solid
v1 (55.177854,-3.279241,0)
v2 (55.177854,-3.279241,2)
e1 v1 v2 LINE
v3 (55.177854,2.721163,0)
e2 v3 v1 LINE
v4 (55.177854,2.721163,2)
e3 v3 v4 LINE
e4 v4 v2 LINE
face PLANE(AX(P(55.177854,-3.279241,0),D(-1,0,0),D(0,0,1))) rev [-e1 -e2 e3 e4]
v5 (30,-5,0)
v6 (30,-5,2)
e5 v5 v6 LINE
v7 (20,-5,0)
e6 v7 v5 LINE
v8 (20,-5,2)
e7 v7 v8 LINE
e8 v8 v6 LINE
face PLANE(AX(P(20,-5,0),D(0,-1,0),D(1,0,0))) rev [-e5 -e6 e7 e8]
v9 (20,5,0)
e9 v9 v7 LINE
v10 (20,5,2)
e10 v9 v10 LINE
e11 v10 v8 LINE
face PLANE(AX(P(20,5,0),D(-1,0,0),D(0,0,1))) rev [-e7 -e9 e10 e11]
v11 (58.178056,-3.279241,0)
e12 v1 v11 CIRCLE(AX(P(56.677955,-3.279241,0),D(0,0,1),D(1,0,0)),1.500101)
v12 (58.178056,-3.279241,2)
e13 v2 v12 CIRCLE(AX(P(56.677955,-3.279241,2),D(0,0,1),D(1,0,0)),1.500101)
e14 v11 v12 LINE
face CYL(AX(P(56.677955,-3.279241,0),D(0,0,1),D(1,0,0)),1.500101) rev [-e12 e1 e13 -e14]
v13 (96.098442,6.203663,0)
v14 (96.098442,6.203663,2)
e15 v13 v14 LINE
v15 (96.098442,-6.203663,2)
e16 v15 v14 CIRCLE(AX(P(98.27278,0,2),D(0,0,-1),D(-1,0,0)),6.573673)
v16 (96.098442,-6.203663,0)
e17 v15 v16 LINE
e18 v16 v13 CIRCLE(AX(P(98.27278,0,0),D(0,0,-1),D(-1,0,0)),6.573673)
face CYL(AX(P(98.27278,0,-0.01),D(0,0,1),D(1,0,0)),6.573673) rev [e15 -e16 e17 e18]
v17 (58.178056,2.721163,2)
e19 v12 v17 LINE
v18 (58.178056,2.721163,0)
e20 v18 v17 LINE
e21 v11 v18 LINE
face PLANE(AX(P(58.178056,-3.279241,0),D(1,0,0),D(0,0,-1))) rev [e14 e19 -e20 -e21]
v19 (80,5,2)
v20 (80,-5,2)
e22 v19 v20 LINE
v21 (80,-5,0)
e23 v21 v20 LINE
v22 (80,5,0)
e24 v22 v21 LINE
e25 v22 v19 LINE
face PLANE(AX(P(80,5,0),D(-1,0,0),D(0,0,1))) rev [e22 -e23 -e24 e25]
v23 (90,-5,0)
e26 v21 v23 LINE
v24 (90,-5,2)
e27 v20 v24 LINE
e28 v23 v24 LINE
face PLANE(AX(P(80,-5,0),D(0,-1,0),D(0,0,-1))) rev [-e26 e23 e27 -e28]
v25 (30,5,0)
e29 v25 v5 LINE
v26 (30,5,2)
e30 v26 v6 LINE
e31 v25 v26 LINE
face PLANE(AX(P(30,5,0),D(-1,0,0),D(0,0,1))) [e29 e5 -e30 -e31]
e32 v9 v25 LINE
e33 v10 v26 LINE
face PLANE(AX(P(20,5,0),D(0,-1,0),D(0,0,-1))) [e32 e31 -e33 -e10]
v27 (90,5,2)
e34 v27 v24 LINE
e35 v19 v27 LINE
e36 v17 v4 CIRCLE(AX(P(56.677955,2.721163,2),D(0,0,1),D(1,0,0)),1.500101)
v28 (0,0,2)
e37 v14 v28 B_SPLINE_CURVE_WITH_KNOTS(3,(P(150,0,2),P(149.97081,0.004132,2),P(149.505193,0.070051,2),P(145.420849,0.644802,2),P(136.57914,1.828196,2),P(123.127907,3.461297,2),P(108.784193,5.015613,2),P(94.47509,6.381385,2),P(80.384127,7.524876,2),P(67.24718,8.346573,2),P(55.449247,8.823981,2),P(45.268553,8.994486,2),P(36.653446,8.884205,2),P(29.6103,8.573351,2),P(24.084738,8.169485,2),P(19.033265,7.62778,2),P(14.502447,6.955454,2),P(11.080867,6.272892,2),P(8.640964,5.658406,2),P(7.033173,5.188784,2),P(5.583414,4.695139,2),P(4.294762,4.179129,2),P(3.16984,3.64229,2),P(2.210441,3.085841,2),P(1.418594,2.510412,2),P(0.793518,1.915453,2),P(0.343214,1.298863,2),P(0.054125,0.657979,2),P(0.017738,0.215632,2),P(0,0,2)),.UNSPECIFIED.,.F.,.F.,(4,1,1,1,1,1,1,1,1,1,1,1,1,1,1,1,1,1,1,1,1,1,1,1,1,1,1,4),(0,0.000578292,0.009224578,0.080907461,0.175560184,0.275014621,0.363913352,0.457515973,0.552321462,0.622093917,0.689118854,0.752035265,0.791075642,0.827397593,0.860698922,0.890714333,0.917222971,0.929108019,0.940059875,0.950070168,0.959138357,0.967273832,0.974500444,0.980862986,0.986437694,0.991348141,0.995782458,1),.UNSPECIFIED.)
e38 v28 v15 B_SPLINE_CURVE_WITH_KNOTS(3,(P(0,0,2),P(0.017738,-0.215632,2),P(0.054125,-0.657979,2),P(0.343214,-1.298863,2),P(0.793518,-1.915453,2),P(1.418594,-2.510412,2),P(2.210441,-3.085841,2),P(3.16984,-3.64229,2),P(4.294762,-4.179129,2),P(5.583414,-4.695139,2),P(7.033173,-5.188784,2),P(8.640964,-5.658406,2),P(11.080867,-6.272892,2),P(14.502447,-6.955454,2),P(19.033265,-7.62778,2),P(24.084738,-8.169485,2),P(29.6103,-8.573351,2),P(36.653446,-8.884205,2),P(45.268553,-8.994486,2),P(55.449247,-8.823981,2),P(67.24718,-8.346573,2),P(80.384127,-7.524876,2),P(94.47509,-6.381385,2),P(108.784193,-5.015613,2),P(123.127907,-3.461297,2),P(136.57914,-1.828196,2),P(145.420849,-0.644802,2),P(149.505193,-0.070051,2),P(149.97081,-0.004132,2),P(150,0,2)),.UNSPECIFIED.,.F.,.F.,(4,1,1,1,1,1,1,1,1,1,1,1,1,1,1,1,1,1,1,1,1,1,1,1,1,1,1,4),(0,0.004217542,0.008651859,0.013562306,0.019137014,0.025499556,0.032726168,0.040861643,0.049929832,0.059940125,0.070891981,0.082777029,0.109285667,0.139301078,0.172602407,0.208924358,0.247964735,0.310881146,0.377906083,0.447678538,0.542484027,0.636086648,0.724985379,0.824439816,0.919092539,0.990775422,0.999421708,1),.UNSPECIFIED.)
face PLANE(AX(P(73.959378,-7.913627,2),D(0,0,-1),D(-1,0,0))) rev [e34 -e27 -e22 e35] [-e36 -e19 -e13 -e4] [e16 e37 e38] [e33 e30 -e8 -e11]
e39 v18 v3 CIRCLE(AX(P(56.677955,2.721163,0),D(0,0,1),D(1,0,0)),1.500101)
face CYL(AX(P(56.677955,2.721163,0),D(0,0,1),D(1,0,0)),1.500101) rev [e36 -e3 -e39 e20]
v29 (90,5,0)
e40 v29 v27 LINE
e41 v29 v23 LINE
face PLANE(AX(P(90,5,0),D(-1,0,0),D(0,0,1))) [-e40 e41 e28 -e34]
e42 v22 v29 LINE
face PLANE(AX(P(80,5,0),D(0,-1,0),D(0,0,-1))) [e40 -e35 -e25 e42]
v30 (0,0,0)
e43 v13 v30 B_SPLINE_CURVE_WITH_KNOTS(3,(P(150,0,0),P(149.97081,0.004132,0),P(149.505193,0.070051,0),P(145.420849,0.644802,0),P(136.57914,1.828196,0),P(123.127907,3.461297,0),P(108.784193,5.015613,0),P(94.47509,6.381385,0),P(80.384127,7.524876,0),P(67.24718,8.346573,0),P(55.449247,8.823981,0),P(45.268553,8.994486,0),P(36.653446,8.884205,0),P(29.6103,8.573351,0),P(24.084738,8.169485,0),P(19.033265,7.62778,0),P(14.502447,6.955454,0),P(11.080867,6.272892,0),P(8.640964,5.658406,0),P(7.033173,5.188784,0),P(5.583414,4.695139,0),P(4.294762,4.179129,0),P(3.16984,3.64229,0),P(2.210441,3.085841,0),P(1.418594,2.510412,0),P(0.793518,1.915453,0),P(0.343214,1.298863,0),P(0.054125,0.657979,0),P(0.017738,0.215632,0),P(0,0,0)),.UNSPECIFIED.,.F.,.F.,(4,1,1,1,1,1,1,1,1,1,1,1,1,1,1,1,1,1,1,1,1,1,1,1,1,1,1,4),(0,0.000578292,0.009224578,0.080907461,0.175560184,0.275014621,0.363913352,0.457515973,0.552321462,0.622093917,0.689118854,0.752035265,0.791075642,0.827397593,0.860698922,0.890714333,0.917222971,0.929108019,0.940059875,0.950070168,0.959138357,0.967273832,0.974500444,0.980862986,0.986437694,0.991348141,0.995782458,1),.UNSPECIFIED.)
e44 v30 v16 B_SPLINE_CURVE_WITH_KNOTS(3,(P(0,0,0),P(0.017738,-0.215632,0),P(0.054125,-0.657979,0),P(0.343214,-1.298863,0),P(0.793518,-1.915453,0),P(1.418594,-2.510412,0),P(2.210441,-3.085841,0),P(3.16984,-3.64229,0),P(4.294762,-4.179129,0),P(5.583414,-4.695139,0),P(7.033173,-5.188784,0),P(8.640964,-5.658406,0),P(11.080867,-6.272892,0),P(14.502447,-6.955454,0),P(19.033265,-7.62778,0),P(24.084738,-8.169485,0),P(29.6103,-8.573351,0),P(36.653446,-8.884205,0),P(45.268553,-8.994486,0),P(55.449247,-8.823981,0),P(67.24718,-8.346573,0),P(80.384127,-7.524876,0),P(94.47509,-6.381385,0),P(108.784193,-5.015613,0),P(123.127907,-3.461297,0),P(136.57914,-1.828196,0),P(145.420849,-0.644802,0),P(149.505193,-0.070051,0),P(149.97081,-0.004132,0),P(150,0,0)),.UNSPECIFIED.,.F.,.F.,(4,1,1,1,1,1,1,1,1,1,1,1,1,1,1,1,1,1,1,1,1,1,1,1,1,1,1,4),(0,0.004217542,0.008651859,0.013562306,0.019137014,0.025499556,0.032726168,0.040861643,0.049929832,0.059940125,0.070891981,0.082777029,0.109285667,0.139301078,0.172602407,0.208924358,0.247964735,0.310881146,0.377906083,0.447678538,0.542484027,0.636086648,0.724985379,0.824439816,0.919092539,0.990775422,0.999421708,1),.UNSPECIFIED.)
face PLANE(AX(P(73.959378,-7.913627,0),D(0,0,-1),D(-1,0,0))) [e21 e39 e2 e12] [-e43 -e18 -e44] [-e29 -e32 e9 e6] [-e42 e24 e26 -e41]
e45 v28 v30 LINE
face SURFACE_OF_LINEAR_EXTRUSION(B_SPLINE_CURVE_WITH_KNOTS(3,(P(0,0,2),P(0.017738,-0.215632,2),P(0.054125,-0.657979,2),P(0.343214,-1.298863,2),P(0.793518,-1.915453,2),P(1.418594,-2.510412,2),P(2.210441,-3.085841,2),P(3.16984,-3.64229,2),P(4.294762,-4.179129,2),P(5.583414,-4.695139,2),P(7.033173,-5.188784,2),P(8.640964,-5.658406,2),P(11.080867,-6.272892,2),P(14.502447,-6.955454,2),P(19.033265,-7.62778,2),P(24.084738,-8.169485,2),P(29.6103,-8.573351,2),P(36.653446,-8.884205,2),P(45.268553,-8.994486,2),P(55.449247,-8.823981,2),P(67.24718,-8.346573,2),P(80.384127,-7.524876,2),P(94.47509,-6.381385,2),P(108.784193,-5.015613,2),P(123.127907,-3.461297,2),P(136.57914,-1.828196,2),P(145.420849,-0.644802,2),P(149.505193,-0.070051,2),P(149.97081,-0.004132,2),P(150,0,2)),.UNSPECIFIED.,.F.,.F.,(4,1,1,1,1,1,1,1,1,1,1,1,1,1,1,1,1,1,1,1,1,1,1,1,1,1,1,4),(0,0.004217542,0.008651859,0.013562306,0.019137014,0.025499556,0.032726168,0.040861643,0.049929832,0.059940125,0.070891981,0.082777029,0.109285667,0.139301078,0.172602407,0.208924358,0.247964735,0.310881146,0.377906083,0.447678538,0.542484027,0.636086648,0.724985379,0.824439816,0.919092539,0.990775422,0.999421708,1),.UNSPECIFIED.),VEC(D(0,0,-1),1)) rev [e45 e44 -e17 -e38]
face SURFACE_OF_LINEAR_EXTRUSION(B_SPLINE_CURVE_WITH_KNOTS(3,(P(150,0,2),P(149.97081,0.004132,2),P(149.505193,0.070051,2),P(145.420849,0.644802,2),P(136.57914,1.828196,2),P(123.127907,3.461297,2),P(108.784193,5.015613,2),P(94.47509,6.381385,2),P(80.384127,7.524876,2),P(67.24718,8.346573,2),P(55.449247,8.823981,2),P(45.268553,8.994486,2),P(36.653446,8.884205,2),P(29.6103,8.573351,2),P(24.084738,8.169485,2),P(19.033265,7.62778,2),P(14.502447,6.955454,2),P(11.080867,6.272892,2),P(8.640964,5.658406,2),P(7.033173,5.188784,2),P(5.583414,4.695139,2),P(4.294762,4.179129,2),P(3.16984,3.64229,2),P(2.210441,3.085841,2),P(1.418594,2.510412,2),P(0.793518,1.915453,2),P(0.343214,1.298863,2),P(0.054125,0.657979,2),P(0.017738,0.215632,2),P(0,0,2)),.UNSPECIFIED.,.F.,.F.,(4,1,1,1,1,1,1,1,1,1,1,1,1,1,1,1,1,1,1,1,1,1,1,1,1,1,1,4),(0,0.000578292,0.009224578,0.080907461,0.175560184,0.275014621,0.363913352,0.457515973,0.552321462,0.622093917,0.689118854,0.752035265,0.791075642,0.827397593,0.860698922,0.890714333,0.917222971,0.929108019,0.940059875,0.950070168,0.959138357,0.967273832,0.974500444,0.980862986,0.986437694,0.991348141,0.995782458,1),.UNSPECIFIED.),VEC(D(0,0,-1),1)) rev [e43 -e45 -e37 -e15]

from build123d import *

# Parameters (mm, degrees)
BOSS_EXTRUDE1_DEPTH = 2
SKETCH2_W           = 10
SKETCH2_H           = 10
CUT_EXTRUDE1_DEPTH  = 2
CUT_EXTRUDE2_DEPTH  = 2
SPLIT2_DEPTH        = 2


# Read off the part's stored shape, not the designer's step: Split2
with BuildPart() as part:
    # Sketch1 → Boss-Extrude1 (new body)
    with BuildSketch(Plane.XY):
        with BuildLine():
            add(Edge.make_bspline(
                [(0, 0), (0.017737679, 0.21563179), (0.054124727, 0.657978531), (0.343214492, 1.298862569), (0.793518335, 1.915453085), (1.418593739, 2.510411621), (2.210440726, 3.08584076), (3.169840337, 3.64229027), (4.294762462, 4.179129104), (5.583413569, 4.69513941), (7.033172592, 5.188783743), (8.640964446, 5.658406049), (11.080866503, 6.272892351), (14.502446863, 6.955454069), (19.033265173, 7.627780104), (24.084738243, 8.169485105), (29.61030038, 8.573350569), (36.653446176, 8.884204814), (45.268552866, 8.994485881), (55.449246929, 8.823980559), (67.247179838, 8.346573268), (80.384127491, 7.524875895), (94.475089666, 6.381384792), (108.784193237, 5.015612692), (123.127907022, 3.461297117), (136.57914049, 1.828195781), (145.420848795, 0.64480177), (149.505193273, 0.070051229), (149.970810304, 0.00413247), (150, 0)],
                knots=[0, 0, 0, 0, 0.004217542, 0.008651859, 0.013562306, 0.019137014, 0.025499556, 0.032726168, 0.040861643, 0.049929832, 0.059940125, 0.070891981, 0.082777029, 0.109285667, 0.139301078, 0.172602407, 0.208924358, 0.247964735, 0.310881146, 0.377906083, 0.447678538, 0.542484027, 0.636086648, 0.724985379, 0.824439816, 0.919092539, 0.990775422, 0.999421708, 1, 1, 1, 1], degree=3))
            add(Edge.make_bspline(
                [(0, 0), (0.017737679, -0.21563179), (0.054124727, -0.657978531), (0.343214492, -1.298862569), (0.793518335, -1.915453085), (1.418593739, -2.510411621), (2.210440726, -3.08584076), (3.169840337, -3.64229027), (4.294762462, -4.179129104), (5.583413569, -4.69513941), (7.033172592, -5.188783743), (8.640964446, -5.658406049), (11.080866503, -6.272892351), (14.502446863, -6.955454069), (19.033265173, -7.627780104), (24.084738243, -8.169485105), (29.61030038, -8.573350569), (36.653446176, -8.884204814), (45.268552866, -8.994485881), (55.449246929, -8.823980559), (67.247179838, -8.346573268), (80.384127491, -7.524875895), (94.475089666, -6.381384792), (108.784193237, -5.015612692), (123.127907022, -3.461297117), (136.57914049, -1.828195781), (145.420848795, -0.64480177), (149.505193273, -0.070051229), (149.970810304, -0.00413247), (150, 0)],
                knots=[0, 0, 0, 0, 0.004217542, 0.008651859, 0.013562306, 0.019137014, 0.025499556, 0.032726168, 0.040861643, 0.049929832, 0.059940125, 0.070891981, 0.082777029, 0.109285667, 0.139301078, 0.172602407, 0.208924358, 0.247964735, 0.310881146, 0.377906083, 0.447678538, 0.542484027, 0.636086648, 0.724985379, 0.824439816, 0.919092539, 0.990775422, 0.999421708, 1, 1, 1, 1], degree=3))
        make_face()
    extrude(amount=BOSS_EXTRUDE1_DEPTH)

    # Sketch2 → Cut-Extrude1 (cut)
    with BuildSketch(Plane.XY.offset(2)):
        with Locations((25, 0)):
            Rectangle(SKETCH2_W, SKETCH2_H)
        with Locations((85, 0)):
            Rectangle(SKETCH2_W, SKETCH2_H)
    extrude(amount=-CUT_EXTRUDE1_DEPTH, mode=Mode.SUBTRACT)

    # Sketch3 → Cut-Extrude2 (cut)
    with BuildSketch(Plane.XY.offset(2)):
        with BuildLine():
            Line((55.177854161, -3.279241302), (55.177854161, 2.721162631))
            ThreePointArc((55.177854161, 2.721162631), (56.677955144, 4.221263615), (58.178056128, 2.721162631))
            Line((58.178056128, 2.721162631), (58.178056128, -3.279241302))
            ThreePointArc((58.178056128, -3.279241302), (56.677955144, -4.779342285), (55.177854161, -3.279241302))
        make_face()
    extrude(amount=-CUT_EXTRUDE2_DEPTH, mode=Mode.SUBTRACT)

    # Split2 outline → Split2 (cut)
    with BuildSketch(Plane.XY):
        with BuildLine():
            add(Edge.make_bspline(
                [(150, 0), (149.970810304, 0.00413247), (149.505193273, 0.070051229), (145.420848795, 0.64480177), (136.57914049, 1.828195781), (123.127907022, 3.461297117), (109.245806797, 4.965591257), (100.149772472, 5.839460679), (96.098442191, 6.203662705)],
                knots=[0, 0, 0, 0, 0.000578292, 0.009224578, 0.080907461, 0.175560184, 0.275014621, 0.354805575, 0.354805575, 0.354805575, 0.354805575], degree=3))
            ThreePointArc((96.098442191, 6.203662705), (91.699107152, 0), (96.098442191, -6.203662705))
            add(Edge.make_bspline(
                [(96.098442191, -6.203662705), (100.149772472, -5.839460679), (109.245806797, -4.965591257), (123.127907022, -3.461297117), (136.57914049, -1.828195781), (145.420848795, -0.64480177), (149.505193273, -0.070051229), (149.970810304, -0.00413247), (150, 0)],
                knots=[0.645194425, 0.645194425, 0.645194425, 0.645194425, 0.724985379, 0.824439816, 0.919092539, 0.990775422, 0.999421708, 1, 1, 1, 1], degree=3))
        make_face()
    extrude(amount=SPLIT2_DEPTH, mode=Mode.SUBTRACT)


solid = part.part
